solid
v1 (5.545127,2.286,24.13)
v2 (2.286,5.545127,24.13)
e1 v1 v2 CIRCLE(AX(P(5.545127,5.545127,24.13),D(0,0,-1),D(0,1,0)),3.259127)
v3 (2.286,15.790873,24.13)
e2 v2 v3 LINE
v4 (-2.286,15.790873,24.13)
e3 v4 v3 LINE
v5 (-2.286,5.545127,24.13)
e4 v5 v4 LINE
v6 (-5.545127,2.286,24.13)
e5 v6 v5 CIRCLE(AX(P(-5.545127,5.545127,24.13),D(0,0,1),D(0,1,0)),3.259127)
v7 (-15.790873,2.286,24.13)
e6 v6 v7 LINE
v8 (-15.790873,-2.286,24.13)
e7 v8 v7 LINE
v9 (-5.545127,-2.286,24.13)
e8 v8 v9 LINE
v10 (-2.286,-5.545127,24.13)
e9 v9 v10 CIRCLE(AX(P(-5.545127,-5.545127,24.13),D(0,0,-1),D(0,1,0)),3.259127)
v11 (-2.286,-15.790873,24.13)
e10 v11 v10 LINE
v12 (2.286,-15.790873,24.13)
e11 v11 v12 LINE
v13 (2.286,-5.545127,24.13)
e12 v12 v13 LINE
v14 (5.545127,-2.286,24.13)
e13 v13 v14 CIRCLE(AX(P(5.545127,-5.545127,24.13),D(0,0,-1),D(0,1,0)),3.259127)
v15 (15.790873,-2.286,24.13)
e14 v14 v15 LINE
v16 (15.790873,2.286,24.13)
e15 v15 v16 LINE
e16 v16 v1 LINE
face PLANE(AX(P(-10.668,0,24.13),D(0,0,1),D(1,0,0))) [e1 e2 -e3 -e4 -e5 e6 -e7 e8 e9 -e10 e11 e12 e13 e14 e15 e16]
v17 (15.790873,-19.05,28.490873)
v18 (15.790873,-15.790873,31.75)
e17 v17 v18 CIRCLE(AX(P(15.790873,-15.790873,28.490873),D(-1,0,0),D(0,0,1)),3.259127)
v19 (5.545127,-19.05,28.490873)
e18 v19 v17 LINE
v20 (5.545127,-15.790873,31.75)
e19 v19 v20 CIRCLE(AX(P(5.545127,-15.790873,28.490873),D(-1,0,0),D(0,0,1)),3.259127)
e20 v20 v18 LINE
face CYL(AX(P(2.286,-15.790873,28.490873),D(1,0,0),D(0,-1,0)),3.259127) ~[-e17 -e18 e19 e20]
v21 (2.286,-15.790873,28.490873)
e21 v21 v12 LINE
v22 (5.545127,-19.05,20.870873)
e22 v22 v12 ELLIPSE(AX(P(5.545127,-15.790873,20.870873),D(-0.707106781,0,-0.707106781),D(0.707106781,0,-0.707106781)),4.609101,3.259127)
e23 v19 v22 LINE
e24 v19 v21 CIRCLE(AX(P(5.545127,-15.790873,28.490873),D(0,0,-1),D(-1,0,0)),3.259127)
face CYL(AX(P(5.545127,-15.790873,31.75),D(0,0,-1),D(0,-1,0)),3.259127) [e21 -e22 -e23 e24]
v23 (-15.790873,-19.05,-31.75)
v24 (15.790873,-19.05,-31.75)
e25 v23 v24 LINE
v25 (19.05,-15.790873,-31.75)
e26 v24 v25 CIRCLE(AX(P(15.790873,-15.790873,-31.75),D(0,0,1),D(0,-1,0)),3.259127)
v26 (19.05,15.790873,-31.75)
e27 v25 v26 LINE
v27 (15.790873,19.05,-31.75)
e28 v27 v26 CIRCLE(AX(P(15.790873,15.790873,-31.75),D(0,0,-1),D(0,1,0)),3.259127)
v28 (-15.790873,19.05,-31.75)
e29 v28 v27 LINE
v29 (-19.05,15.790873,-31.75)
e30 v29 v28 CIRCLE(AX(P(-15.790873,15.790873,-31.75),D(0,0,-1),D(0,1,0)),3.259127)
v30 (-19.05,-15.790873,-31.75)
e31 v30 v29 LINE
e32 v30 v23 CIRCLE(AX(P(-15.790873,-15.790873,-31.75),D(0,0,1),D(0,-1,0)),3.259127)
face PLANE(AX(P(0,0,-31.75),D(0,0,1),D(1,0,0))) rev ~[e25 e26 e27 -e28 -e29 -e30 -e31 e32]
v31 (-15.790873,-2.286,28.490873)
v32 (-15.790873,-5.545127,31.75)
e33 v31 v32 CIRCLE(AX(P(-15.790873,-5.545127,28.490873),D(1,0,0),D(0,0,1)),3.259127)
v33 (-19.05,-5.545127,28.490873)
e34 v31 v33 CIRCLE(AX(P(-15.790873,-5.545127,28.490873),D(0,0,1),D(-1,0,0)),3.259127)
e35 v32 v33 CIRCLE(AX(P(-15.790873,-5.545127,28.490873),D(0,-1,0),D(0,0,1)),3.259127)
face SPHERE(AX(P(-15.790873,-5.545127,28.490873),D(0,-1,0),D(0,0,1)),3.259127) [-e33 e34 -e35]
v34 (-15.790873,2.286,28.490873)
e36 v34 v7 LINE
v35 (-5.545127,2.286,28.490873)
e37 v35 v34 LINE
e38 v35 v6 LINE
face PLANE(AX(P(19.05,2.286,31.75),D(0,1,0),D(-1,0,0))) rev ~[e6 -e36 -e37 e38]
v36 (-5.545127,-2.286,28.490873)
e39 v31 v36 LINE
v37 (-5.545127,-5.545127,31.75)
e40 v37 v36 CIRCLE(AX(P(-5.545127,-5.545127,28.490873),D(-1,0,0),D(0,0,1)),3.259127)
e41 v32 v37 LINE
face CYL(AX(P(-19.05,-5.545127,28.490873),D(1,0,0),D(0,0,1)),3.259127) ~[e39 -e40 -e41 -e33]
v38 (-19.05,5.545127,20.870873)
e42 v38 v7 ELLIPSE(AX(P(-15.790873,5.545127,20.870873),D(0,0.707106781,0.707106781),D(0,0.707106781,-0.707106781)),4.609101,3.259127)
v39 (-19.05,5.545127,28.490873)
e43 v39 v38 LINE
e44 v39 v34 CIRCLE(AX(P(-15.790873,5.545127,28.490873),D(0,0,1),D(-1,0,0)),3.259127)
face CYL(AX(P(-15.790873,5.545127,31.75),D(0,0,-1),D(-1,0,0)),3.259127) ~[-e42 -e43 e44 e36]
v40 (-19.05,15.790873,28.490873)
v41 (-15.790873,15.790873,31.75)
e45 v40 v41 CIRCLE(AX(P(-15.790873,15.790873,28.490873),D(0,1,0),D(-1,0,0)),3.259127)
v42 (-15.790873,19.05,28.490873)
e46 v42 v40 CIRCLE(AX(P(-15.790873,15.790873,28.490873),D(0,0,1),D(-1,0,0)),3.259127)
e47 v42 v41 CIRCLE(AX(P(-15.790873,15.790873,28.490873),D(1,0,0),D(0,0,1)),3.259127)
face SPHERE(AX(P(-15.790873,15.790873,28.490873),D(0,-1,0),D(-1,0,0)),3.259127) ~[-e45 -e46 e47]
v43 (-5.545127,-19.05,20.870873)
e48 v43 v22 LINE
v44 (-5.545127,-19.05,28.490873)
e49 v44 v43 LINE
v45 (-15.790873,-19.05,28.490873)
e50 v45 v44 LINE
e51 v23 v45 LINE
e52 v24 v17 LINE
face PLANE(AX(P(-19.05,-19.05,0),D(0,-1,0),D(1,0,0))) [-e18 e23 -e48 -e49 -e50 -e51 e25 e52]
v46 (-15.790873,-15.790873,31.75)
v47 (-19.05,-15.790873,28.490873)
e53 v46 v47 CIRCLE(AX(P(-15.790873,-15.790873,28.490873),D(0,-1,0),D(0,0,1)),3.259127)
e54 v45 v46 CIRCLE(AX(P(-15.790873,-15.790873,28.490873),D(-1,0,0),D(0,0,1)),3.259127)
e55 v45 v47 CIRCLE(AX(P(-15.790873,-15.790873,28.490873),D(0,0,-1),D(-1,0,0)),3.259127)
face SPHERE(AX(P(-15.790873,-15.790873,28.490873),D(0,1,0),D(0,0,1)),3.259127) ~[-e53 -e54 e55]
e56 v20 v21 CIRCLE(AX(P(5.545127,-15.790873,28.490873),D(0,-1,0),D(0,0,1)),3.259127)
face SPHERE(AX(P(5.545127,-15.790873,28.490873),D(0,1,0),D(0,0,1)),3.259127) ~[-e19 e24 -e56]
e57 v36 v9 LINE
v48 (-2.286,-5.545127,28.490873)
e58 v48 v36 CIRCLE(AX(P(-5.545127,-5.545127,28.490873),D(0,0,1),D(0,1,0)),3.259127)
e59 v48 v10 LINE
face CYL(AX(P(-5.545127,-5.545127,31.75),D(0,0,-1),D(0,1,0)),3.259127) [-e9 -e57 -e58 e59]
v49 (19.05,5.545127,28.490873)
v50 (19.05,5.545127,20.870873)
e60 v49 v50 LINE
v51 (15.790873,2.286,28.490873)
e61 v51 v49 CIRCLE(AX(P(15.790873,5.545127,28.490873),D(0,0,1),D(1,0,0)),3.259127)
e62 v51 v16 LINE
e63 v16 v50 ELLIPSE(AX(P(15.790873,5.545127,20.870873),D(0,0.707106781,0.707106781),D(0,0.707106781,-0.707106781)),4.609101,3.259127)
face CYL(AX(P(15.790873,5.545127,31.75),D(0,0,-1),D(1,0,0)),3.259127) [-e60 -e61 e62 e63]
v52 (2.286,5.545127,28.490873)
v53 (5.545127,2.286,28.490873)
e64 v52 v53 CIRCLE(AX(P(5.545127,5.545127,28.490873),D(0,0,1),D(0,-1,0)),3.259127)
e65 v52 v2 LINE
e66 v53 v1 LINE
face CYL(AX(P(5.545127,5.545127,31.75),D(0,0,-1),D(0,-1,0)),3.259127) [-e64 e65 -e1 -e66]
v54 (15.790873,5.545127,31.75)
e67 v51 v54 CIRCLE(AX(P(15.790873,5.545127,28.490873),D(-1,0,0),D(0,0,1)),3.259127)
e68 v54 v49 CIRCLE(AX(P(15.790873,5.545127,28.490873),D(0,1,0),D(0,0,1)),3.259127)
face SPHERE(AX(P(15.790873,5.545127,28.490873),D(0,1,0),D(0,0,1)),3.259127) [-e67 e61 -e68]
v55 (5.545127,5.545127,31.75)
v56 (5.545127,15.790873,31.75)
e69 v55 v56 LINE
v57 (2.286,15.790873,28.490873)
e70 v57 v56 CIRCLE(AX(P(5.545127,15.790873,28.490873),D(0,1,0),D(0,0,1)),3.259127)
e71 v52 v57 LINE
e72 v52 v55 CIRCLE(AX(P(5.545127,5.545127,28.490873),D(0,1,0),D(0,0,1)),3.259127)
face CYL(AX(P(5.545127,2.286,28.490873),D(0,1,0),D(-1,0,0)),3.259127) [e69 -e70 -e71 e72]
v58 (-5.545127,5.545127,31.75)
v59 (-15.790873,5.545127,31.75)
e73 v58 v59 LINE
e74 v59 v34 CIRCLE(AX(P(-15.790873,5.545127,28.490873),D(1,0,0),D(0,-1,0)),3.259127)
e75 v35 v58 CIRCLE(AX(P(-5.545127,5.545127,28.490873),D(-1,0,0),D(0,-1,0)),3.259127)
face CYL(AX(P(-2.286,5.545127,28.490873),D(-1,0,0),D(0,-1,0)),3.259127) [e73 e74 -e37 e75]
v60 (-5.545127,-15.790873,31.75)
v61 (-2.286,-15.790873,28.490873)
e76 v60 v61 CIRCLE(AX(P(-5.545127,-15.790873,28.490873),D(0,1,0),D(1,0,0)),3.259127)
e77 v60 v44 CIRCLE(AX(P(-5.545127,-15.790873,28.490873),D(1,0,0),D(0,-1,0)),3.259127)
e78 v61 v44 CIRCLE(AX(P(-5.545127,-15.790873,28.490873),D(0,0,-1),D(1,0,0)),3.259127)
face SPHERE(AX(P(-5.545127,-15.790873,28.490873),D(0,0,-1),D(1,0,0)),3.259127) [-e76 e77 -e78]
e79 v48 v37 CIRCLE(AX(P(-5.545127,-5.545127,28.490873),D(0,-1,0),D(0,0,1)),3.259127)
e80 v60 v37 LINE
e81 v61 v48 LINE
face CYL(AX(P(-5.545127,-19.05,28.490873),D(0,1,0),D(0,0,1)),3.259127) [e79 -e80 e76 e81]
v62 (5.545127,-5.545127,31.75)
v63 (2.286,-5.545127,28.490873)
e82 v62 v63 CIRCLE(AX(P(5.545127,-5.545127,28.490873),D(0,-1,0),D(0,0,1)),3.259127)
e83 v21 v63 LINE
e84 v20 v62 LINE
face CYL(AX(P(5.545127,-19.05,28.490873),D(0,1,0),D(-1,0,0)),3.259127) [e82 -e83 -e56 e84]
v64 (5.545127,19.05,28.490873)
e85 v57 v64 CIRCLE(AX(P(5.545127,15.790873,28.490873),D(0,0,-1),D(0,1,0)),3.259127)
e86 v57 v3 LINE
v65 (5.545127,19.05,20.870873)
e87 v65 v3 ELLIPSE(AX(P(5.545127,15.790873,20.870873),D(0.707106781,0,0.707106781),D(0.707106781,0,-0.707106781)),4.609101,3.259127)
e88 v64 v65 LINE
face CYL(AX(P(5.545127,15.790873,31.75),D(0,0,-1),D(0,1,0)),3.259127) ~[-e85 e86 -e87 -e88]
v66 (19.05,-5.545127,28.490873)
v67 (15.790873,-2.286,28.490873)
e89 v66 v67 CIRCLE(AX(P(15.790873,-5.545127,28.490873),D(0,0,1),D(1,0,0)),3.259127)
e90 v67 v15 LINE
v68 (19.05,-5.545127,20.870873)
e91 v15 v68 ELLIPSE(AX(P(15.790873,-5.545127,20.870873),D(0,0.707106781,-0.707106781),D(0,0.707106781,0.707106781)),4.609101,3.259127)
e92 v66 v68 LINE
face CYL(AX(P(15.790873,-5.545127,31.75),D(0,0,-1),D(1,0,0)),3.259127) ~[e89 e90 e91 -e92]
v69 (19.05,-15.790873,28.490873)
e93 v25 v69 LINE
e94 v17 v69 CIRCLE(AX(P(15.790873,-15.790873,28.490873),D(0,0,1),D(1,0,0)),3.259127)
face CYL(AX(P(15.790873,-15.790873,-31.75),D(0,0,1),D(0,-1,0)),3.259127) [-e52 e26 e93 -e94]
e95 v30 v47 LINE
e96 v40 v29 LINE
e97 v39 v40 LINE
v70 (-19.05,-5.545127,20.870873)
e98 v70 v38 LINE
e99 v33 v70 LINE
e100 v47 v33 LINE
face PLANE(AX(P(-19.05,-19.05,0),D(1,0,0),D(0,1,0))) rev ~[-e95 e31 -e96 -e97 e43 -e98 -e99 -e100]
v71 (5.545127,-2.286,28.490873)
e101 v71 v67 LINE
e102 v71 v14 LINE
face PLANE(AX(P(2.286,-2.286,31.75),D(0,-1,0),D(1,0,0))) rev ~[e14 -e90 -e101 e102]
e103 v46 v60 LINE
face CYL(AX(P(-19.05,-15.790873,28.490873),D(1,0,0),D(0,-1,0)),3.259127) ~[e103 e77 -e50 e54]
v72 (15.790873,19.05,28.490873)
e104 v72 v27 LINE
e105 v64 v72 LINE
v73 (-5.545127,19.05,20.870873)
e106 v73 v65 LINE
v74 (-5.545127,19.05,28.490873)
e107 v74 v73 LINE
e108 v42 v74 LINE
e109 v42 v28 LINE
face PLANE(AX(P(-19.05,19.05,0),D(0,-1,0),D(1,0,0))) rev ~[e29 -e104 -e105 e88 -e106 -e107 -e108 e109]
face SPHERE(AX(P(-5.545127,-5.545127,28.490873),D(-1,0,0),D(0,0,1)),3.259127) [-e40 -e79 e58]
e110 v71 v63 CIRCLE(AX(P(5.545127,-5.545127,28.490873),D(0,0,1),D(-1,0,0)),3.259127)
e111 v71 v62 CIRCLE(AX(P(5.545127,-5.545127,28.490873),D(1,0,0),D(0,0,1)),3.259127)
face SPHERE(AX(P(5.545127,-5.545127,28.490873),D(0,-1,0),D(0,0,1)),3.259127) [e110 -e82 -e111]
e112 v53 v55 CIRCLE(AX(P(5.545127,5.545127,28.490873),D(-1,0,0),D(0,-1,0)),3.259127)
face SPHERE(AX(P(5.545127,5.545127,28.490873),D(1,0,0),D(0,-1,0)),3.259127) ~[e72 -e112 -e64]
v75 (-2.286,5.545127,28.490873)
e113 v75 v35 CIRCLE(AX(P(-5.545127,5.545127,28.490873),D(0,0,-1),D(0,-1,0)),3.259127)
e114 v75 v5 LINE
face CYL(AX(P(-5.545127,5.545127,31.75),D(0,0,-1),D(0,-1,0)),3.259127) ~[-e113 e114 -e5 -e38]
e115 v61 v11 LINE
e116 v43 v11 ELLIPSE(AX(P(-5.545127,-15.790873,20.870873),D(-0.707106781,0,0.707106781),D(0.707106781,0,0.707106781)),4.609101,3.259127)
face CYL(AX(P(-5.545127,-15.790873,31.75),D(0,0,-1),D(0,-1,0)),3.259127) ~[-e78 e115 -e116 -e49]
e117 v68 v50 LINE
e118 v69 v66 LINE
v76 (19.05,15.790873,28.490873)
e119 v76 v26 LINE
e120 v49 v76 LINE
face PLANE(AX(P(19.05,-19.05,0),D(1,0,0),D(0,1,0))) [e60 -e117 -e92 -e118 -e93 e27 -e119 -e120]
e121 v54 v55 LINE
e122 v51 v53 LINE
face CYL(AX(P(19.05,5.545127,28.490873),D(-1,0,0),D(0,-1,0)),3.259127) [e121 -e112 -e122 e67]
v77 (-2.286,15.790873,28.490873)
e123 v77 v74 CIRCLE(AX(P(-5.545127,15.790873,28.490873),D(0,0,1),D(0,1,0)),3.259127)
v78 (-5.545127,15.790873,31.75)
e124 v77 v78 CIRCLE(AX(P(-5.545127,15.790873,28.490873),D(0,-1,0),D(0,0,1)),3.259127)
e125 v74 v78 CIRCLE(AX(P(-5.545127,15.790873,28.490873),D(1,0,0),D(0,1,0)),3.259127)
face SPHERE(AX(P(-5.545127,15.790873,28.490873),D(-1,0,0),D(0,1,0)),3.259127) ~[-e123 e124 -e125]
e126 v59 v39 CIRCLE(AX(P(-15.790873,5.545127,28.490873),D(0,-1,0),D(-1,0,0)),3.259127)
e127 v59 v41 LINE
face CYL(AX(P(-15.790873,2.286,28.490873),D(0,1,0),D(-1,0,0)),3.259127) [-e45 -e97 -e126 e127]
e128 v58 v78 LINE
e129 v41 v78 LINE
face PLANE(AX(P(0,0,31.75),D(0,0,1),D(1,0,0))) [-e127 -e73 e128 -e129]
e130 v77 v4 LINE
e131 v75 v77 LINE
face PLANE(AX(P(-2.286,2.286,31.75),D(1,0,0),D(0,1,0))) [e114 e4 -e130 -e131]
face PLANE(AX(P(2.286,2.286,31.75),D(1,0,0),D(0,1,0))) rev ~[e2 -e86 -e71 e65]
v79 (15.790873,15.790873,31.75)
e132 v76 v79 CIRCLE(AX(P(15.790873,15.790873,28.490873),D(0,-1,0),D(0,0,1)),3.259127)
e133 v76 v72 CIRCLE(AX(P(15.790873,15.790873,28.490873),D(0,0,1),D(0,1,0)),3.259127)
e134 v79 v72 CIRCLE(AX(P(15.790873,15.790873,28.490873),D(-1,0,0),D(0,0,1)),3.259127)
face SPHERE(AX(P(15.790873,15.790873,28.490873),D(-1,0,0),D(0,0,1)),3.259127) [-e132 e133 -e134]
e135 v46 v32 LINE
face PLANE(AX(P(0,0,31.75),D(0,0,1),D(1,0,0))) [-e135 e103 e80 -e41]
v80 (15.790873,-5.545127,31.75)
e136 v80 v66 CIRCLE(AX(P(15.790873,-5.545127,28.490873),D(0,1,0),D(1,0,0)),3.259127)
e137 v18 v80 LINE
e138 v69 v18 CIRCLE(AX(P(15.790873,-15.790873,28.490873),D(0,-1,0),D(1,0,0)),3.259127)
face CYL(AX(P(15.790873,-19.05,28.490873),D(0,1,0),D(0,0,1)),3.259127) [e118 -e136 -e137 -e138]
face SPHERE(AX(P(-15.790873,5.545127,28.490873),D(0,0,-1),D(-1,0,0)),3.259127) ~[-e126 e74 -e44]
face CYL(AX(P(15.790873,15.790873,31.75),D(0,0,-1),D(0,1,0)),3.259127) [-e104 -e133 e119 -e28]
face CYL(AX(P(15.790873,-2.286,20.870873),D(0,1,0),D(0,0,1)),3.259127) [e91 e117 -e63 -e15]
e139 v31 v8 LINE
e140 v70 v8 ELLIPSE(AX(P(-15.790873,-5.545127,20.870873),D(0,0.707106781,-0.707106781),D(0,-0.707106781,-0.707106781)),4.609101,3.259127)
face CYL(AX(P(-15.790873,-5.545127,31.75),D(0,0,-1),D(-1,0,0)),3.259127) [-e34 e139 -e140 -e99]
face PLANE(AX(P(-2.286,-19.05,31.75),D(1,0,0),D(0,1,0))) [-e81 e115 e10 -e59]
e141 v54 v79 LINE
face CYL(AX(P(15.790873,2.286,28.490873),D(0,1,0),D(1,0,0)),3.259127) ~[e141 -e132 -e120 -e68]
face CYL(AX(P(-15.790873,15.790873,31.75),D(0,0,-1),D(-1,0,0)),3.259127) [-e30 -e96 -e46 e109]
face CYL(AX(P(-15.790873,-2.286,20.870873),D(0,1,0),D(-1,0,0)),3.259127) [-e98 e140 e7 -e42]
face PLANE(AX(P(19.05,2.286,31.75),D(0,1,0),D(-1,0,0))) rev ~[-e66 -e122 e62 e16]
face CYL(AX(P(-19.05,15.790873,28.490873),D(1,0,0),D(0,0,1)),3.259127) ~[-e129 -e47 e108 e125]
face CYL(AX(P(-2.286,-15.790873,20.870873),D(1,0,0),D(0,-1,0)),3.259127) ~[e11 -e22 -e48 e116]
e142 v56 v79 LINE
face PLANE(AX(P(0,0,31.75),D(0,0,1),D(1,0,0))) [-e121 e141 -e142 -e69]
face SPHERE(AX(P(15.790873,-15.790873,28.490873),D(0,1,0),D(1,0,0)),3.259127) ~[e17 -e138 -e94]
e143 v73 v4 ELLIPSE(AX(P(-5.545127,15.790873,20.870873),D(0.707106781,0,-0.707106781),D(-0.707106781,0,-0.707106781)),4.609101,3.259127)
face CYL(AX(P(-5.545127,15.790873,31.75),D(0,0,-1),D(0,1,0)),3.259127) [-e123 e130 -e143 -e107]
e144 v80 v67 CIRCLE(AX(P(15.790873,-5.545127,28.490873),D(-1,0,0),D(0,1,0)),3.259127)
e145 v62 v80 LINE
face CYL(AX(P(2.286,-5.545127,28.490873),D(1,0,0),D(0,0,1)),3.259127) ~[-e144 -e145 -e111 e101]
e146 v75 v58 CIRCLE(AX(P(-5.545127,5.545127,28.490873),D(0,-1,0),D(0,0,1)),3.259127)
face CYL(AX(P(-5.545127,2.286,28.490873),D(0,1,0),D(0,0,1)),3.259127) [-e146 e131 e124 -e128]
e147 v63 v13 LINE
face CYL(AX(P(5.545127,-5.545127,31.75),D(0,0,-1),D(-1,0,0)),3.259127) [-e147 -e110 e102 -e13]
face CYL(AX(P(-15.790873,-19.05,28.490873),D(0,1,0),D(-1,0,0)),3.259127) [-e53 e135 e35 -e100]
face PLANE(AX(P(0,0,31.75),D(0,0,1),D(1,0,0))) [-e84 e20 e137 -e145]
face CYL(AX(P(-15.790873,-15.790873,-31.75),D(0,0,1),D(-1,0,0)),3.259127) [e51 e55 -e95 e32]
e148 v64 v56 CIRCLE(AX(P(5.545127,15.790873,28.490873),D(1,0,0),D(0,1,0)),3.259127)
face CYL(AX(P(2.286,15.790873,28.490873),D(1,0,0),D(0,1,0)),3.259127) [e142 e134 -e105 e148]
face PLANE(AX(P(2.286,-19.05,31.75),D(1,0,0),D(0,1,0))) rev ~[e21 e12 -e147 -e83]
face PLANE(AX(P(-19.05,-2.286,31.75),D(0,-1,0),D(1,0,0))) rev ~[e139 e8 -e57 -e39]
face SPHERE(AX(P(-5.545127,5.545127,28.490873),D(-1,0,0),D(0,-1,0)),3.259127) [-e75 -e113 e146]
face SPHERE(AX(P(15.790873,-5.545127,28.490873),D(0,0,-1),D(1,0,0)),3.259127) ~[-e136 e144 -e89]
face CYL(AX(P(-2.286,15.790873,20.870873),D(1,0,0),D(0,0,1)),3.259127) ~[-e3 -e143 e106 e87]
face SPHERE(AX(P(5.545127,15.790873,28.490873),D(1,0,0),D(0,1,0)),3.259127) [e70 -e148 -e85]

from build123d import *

# Parameters (mm, degrees)
F0_W     = 38.1
F0_H     = 38.1
F2_DEPTH = 31.75
F4_W     = 4.572
F4_H     = 16.764
F3_W     = 16.764
F3_H     = 4.572
F3_W_2   = 4.572
F3_H_2   = 16.764
F5_DEPTH = 7.62
F6_R     = 3.2591265624


with BuildPart() as f2:
    # F0 (on Top) → F2 (new body, symmetric)
    with BuildSketch(Plane.XY):
        Rectangle(F0_W, F0_H)
    extrude(amount=F2_DEPTH, both=True)

    # F4 (on face) + F3 (on face) → F5 (cut)
    with BuildSketch(Plane.XY.offset(31.75)):
        with Locations((0, 10.668)):
            Rectangle(F4_W, F4_H)
    with BuildSketch(Plane.XY.offset(31.75)):
        with Locations((-10.668, 0)):
            Rectangle(F3_W, F3_H)
        Rectangle(F3_W_2, F3_H)
        with Locations((10.668, 0)):
            Rectangle(F3_W, F3_H)
        with Locations((0, -10.668)):
            Rectangle(F3_W_2, F3_H_2)
    extrude(amount=-F5_DEPTH, mode=Mode.SUBTRACT)

    # F6
    f6_edges = [f2.edges().sort_by_distance(p)[0] for p in [
        (10.668, 19.05, 31.75),
        (19.05, 10.668, 31.75),
        (19.05, 19.05, 0),
        (2.286, -10.668, 31.75),
        (10.668, 2.286, 31.75),
        (19.05, 0, 24.13),
        (19.05, 2.286, 27.94),
        (19.05, -2.286, 27.94),
        (19.05, -10.668, 31.75),
        (19.05, -19.05, 0),
        (10.668, -19.05, 31.75),
        (2.286, -19.05, 27.94),
        (0, -19.05, 24.13),
        (-2.286, -19.05, 27.94),
        (10.668, -2.286, 31.75),
        (-19.05, -10.668, 31.75),
        (-10.668, -2.286, 31.75),
        (-2.286, -10.668, 31.75),
        (-10.668, -19.05, 31.75),
        (-19.05, -2.286, 27.94),
        (-19.05, 0, 24.13),
        (-19.05, 2.286, 27.94),
        (-19.05, 10.668, 31.75),
        (-19.05, 19.05, 0),
        (-10.668, 19.05, 31.75),
        (-10.668, 2.286, 31.75),
        (-2.286, 19.05, 27.94),
        (2.286, 19.05, 27.94),
        (0, 19.05, 24.13),
        (-2.286, 2.286, 27.94),
        (-2.286, -2.286, 27.94),
        (2.286, 2.286, 27.94),
        (2.286, -2.286, 27.94),
        (-19.05, -19.05, 0),
        (-2.286, 10.668, 31.75),
        (2.286, 10.668, 31.75),
    ]]
    fillet(f6_edges, radius=F6_R)


solid = f2.part
